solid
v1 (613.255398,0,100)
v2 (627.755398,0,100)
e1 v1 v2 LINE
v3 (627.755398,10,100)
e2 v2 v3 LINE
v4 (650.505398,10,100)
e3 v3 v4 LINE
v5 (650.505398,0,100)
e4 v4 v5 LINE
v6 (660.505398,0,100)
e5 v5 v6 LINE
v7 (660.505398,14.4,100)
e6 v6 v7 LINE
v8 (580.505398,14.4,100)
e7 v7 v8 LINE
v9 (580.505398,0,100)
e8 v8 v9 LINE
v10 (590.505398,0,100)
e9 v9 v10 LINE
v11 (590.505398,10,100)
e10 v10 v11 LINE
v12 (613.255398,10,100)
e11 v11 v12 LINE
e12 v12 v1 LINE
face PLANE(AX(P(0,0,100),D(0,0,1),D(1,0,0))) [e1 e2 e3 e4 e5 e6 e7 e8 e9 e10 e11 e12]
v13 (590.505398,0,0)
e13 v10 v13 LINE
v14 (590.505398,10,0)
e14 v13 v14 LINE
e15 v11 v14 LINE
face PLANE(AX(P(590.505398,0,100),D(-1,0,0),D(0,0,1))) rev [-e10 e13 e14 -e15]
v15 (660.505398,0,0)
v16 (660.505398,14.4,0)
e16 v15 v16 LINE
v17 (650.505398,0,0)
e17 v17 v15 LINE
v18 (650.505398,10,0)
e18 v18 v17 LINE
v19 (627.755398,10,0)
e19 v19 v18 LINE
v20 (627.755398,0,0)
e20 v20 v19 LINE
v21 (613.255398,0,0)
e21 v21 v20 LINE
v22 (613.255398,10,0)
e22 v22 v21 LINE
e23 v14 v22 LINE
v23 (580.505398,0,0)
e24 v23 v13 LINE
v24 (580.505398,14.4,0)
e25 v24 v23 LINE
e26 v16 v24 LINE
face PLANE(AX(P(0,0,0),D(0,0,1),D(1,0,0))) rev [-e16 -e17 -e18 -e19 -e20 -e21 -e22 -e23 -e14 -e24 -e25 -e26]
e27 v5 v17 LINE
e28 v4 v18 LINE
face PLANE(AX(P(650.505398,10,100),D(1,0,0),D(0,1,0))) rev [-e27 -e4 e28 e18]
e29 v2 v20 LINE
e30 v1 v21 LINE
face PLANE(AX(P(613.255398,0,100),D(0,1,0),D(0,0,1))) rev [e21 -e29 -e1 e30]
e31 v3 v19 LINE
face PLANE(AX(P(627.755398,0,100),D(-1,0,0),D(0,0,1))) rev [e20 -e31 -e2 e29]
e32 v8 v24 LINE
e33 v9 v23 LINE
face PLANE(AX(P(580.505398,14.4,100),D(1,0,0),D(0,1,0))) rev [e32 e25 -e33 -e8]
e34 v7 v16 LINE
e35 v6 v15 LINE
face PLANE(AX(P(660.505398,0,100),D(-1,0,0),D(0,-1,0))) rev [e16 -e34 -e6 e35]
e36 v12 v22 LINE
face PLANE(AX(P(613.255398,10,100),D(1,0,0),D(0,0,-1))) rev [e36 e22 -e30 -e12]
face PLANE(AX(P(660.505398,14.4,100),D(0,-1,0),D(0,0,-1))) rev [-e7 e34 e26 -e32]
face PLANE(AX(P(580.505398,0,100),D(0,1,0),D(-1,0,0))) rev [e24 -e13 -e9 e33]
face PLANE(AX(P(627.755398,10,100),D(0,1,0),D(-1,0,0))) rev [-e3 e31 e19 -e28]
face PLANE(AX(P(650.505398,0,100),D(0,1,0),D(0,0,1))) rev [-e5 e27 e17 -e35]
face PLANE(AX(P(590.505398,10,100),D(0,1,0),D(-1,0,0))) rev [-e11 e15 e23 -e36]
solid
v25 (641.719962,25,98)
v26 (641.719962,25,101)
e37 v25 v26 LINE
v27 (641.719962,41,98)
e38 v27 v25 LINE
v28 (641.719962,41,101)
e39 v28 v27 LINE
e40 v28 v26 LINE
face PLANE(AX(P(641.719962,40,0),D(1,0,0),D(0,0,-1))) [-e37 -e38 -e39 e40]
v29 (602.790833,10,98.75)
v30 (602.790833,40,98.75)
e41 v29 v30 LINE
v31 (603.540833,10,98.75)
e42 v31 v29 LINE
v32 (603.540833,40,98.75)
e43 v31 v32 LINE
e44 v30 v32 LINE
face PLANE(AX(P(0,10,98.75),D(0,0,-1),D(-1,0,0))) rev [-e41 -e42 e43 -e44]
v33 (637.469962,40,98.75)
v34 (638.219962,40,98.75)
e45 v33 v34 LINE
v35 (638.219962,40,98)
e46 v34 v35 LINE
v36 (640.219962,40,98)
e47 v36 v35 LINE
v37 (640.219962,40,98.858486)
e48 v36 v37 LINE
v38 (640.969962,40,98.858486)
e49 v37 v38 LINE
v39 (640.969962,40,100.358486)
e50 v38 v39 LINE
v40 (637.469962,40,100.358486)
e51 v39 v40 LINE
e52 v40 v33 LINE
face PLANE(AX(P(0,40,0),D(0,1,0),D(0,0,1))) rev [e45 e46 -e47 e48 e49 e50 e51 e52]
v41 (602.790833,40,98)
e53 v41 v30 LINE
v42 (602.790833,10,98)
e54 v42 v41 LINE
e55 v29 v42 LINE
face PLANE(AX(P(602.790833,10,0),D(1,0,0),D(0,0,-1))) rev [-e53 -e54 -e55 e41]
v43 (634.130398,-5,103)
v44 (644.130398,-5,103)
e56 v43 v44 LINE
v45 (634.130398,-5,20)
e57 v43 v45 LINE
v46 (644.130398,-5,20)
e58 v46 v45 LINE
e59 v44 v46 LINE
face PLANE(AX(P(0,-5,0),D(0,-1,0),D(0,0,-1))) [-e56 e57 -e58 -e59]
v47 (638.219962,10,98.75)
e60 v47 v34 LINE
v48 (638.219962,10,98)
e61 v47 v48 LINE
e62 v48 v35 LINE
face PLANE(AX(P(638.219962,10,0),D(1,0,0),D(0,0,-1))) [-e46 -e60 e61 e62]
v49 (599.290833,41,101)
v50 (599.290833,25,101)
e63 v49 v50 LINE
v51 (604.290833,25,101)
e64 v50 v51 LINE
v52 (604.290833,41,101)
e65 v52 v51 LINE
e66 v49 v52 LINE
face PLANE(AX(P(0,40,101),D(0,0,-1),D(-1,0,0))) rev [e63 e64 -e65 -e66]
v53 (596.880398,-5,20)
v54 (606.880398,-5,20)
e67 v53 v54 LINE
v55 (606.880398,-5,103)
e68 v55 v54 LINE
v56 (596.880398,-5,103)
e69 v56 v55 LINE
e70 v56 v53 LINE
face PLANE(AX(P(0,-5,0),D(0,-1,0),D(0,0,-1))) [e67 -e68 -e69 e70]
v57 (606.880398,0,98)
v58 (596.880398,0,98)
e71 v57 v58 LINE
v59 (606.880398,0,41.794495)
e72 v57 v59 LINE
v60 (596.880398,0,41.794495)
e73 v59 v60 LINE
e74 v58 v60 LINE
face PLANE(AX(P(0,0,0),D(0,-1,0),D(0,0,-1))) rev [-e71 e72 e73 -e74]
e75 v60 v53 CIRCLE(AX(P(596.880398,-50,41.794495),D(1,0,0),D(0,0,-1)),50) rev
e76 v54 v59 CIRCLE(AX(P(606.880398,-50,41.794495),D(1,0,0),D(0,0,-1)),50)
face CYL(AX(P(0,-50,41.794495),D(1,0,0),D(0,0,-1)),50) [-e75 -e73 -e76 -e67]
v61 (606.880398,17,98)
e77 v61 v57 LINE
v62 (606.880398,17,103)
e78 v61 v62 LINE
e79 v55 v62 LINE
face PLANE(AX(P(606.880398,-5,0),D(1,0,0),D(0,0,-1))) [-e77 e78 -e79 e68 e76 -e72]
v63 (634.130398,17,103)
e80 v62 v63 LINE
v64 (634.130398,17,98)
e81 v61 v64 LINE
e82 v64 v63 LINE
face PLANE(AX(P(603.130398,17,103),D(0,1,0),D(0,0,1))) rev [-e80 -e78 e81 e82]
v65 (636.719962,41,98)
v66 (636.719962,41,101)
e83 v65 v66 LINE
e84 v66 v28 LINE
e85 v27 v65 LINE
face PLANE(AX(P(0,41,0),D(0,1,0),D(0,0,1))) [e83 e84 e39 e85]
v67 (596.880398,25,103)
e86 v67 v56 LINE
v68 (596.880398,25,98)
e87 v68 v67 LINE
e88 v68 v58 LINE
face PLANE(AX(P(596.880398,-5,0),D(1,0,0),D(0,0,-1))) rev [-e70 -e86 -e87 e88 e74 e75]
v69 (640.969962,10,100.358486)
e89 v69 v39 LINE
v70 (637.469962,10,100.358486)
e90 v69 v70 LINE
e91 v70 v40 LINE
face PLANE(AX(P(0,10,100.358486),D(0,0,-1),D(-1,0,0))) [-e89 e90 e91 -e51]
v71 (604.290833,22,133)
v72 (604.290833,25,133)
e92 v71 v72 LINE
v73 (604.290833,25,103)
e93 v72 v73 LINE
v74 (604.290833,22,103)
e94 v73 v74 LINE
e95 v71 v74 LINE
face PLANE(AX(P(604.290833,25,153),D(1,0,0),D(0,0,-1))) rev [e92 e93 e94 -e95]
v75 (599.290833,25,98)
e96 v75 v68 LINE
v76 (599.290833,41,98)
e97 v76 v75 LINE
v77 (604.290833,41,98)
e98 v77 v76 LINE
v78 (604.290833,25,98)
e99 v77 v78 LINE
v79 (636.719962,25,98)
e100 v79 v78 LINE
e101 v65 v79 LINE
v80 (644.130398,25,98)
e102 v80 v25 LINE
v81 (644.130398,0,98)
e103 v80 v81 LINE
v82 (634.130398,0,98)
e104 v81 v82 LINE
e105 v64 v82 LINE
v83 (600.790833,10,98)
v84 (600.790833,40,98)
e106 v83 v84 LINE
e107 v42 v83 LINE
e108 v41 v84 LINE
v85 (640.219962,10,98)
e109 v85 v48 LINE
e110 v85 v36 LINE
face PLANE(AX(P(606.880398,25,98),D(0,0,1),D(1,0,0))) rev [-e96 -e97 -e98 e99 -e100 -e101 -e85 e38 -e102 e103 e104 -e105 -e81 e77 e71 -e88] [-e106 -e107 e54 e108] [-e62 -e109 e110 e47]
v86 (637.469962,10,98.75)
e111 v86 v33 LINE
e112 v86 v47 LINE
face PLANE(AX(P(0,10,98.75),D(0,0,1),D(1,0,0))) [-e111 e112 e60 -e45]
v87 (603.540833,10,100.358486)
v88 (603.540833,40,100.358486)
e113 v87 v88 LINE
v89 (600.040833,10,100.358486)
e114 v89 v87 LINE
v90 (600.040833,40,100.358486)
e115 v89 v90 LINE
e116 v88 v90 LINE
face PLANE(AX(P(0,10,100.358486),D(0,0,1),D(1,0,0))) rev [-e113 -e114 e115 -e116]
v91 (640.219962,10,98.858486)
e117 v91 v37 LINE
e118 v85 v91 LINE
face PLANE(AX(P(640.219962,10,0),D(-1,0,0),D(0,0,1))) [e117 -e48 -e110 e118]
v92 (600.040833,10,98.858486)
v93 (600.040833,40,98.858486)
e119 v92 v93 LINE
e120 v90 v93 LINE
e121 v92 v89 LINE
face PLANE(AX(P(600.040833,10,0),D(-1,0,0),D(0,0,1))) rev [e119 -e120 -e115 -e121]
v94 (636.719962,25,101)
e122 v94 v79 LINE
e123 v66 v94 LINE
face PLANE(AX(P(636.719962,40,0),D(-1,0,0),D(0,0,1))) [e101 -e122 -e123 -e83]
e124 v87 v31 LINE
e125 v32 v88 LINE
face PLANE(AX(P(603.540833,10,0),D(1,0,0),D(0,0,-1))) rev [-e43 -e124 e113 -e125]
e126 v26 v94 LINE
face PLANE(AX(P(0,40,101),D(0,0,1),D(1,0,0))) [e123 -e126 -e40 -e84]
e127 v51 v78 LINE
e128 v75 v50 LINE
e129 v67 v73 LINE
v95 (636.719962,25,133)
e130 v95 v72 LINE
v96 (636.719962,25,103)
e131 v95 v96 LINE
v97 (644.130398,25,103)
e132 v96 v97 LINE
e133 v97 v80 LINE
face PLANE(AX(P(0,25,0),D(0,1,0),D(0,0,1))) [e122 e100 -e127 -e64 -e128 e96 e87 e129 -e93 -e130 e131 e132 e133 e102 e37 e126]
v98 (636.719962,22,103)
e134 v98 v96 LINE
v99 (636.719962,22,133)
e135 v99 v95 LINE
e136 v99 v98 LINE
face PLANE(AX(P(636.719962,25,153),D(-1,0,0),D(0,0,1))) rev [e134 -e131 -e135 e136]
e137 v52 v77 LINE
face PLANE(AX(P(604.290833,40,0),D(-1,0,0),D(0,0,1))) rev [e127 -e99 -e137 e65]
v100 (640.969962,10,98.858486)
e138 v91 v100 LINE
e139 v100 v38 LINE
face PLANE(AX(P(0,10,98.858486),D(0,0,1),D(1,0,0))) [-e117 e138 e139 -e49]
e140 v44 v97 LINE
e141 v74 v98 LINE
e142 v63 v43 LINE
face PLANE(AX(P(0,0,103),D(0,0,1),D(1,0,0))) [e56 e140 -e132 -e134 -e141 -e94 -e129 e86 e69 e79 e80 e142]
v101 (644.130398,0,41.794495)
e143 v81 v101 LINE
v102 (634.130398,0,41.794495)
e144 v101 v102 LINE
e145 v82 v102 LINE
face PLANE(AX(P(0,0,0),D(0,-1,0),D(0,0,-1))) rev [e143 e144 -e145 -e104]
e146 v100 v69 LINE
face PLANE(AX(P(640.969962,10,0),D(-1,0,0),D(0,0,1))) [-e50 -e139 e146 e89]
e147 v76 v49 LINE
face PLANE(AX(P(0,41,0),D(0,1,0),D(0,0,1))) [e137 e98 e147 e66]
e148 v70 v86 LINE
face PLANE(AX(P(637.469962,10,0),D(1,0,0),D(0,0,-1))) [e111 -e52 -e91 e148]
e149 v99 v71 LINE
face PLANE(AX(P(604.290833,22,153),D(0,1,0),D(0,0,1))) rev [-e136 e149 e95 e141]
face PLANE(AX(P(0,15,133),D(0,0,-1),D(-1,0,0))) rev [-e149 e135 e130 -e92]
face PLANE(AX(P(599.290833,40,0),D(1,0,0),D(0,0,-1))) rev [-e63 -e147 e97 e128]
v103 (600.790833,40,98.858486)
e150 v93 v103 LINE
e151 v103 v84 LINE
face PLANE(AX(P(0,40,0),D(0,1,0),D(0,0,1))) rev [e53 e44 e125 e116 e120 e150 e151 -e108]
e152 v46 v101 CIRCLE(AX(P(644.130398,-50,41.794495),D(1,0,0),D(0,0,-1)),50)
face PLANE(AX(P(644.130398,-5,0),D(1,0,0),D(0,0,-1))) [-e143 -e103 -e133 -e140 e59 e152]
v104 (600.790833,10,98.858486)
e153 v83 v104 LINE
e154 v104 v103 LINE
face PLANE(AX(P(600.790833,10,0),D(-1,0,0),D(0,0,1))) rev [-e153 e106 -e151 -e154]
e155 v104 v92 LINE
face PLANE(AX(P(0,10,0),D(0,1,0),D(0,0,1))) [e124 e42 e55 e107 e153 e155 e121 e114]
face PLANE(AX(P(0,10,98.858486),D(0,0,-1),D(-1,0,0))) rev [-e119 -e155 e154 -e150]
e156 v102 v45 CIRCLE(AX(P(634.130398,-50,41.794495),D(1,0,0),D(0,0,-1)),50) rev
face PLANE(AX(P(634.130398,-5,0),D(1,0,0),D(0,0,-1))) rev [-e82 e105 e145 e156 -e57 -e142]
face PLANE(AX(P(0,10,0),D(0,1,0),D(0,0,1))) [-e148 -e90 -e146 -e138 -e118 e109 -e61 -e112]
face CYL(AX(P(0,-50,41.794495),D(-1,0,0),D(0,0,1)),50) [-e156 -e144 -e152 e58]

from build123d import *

# Parameters (mm, degrees)
Y_KSEKLIK_EKSTR_ZYON1_DEPTH   = 100
IZIM3_W                       = 10
IZIM3_H                       = 80
Y_KSEKLIK_EKSTR_ZYON4_DEPTH   = 5
Y_KSEKLIK_EKSTR_ZYON4_2_DEPTH = 5
IZIM5_W                       = 10
IZIM5_H                       = 5
Y_KSEKLIK_EKSTR_ZYON5_DEPTH   = 3
IZIM7_W                       = 10
IZIM7_H                       = 5
Y_KSEKLIK_EKSTR_ZYON6_DEPTH   = 25
RADYUS3_START                 = 596.88039773
RADYUS3_DEPTH                 = 10
RADYUS4_R                     = 50
IZIM8_W                       = 5
IZIM8_H                       = 8
Y_KSEKLIK_EKSTR_ZYON8_DEPTH   = 31
KES_EKSTR_ZYON3_DEPTH         = 15
Y_KSEKLIK_EKSTR_ZYON10_DEPTH  = 15
IZIM16_W                      = 32.429128763
IZIM16_H                      = 3
Y_KSEKLIK_EKSTR_ZYON12_DEPTH  = 50
IZIM17_W                      = 5
IZIM17_H                      = 3
Y_KSEKLIK_EKSTR_ZYON13_DEPTH  = 1
IZIM18_W                      = 32.429128763
IZIM18_H                      = 20
KES_EKSTR_ZYON4_DEPTH         = 10


with BuildPart() as part:
    # Çizim1 → Yükseklik-Ekstrüzyon1 (new body)
    with BuildSketch(Plane.XY):
        Polygon((580.50539773, 0), (590.50539773, 0), (590.50539773, 10), (613.25539773, 10), (613.25539773, 0), (627.75539773, 0), (627.75539773, 10), (650.50539773, 10), (650.50539773, 0), (660.50539773, 0), (660.50539773, 14.4), (580.50539773, 14.4), align=None)
    extrude(amount=Y_KSEKLIK_EKSTR_ZYON1_DEPTH)


with BuildPart() as body_2:
    # Çizim3 → Yükseklik-Ekstrüzyon4 (new body)
    with BuildSketch(Plane(origin=(0, 0, 0), x_dir=(-1, 0, 0), z_dir=(0, -1, 0))):
        with Locations((-601.88039773, -60)):
            Rectangle(IZIM3_W, IZIM3_H)
    extrude(amount=Y_KSEKLIK_EKSTR_ZYON4_DEPTH)



with BuildPart() as body_3:
    # Çizim3 → Y_kseklik-Ekstr_zyon4 2 (new body)
    with BuildSketch(Plane(origin=(0, 0, 0), x_dir=(-1, 0, 0), z_dir=(0, -1, 0))):
        with Locations((-639.13039773, -60)):
            Rectangle(IZIM3_W, IZIM3_H)
    extrude(amount=Y_KSEKLIK_EKSTR_ZYON4_2_DEPTH)


with BuildPart() as body_2_1:
    add(body_2.part)

    add(body_3.part)  # Yükseklik-Ekstrüzyon5 merges body 3
    # Çizim5 → Yükseklik-Ekstrüzyon5 (add)
    with BuildSketch(Plane.XY.offset(100)):
        with Locations((601.88039773, -2.5)):
            Rectangle(IZIM5_W, IZIM5_H)
        with Locations((639.13039773, -2.5)):
            Rectangle(IZIM5_W, IZIM5_H)
    extrude(amount=Y_KSEKLIK_EKSTR_ZYON5_DEPTH)

    # Çizim7 → Yükseklik-Ekstrüzyon6 (add)
    with BuildSketch(Plane(origin=(0, 0, 0), x_dir=(1, 0, 0), z_dir=(0, 1, 0))):
        with Locations((601.88039773, -100.5)):
            Rectangle(IZIM7_W, IZIM7_H)
        with Locations((639.13039773, -100.5)):
            Rectangle(IZIM7_W, IZIM7_H)
    extrude(amount=Y_KSEKLIK_EKSTR_ZYON6_DEPTH)

    # Radyus3: read off the stored shape, not the designer's step
    # Radyus3 outline → Radyus3 (cut)
    with BuildSketch(Plane.YZ.offset(RADYUS3_START)):
        with BuildLine():
            ThreePointArc((0, 41.794494718), (-1.266028276, 30.61415483), (-5, 20))
            Line((-5, 20), (0, 20))
            Line((0, 20), (0, 41.794494718))
        make_face()
    extrude(amount=RADYUS3_DEPTH, mode=Mode.SUBTRACT)

    # Radyus4
    # the kernel refuses this fillet: 50 mm, written as the material it takes off along each edge
    with BuildSketch(Plane(origin=(698.616634524, 0, 20), x_dir=(0, 0, 1), z_dir=(-1, 0, 0))) as radyus4_piece_1:
        with BuildLine():
            CenterArc((21.794494718, -50), RADYUS4_R, 90, 25.841932763)
            Line((0, -5), (-0.435889894, -4.1))
            ThreePointArc((-0.435889894, -4.1), (-1, -2.5), (-1, 0))
            Line((-1, 0), (0, 1))
            Line((0, 1), (21.794494718, 1))
            Line((21.794494718, 1), (21.794494718, 0))
        make_face()
    extrude(amount=118.972473589, mode=Mode.SUBTRACT)

    # Çizim8 → Yükseklik-Ekstrüzyon8 (add)
    with BuildSketch(Plane.ZY.offset(-634.13039773)):
        with Locations((100.5, 21)):
            Rectangle(IZIM8_W, IZIM8_H)
    extrude(amount=Y_KSEKLIK_EKSTR_ZYON8_DEPTH)

    # Çizim9 → Kes-Ekstrüzyon3 (cut)
    with BuildSketch(Plane(origin=(0, 25, 0), x_dir=(1, 0, 0), z_dir=(0, 1, 0))):
        Polygon((602.790833348, -98.75), (602.790833348, -98), (600.790833348, -98), (600.790833348, -98.858486155), (600.040833348, -98.858486155), (600.040833348, -100.358486155), (603.540833348, -100.358486155), (603.540833348, -98.75), align=None)
        Polygon((640.219962111, -98), (638.219962111, -98), (638.219962111, -98.75), (637.469962111, -98.75), (637.469962111, -100.358486155), (640.969962111, -100.358486155), (640.969962111, -98.858486155), (640.219962111, -98.858486155), align=None)
    extrude(amount=-KES_EKSTR_ZYON3_DEPTH, mode=Mode.SUBTRACT)

    # Çizim15 → Yükseklik-Ekstrüzyon10 (add)
    with BuildSketch(Plane(origin=(0, 25, 0), x_dir=(1, 0, 0), z_dir=(0, 1, 0))):
        Polygon((600.040833348, -98.858486155), (600.790833348, -98.858486155), (600.790833348, -98), (599.290833348, -98), (599.290833348, -101), (604.290833348, -101), (604.290833348, -98), (602.790833348, -98), (602.790833348, -98.75), (603.540833348, -98.75), (603.540833348, -100.358486155), (600.040833348, -100.358486155), align=None)
        Polygon((638.219962111, -98), (636.719962111, -98), (636.719962111, -101), (641.719962111, -101), (641.719962111, -98), (640.219962111, -98), (640.219962111, -98.858486155), (640.969962111, -98.858486155), (640.969962111, -100.358486155), (637.469962111, -100.358486155), (637.469962111, -98.75), (638.219962111, -98.75), align=None)
    extrude(amount=Y_KSEKLIK_EKSTR_ZYON10_DEPTH)

    # Çizim16 → Yükseklik-Ekstrüzyon12 (add)
    with BuildSketch(Plane.XY.offset(103)):
        with Locations((620.50539773, 23.5)):
            Rectangle(IZIM16_W, IZIM16_H)
    extrude(amount=Y_KSEKLIK_EKSTR_ZYON12_DEPTH)

    # Çizim17 → Yükseklik-Ekstrüzyon13 (add)
    with BuildSketch(Plane(origin=(0, 40, 0), x_dir=(1, 0, 0), z_dir=(0, 1, 0))):
        with Locations((639.219962111, -99.5)):
            Rectangle(IZIM17_W, IZIM17_H)
        with Locations((601.790833348, -99.5)):
            Rectangle(IZIM17_W, IZIM17_H)
    extrude(amount=Y_KSEKLIK_EKSTR_ZYON13_DEPTH)

    # Çizim18 → Kes-Ekstrüzyon4 (cut)
    with BuildSketch(Plane(origin=(0, 25, 0), x_dir=(1, 0, 0), z_dir=(0, 1, 0))):
        with Locations((620.50539773, -143)):
            Rectangle(IZIM18_W, IZIM18_H)
    extrude(amount=-KES_EKSTR_ZYON4_DEPTH, mode=Mode.SUBTRACT)


solid = Compound([part.part, body_2_1.part])
